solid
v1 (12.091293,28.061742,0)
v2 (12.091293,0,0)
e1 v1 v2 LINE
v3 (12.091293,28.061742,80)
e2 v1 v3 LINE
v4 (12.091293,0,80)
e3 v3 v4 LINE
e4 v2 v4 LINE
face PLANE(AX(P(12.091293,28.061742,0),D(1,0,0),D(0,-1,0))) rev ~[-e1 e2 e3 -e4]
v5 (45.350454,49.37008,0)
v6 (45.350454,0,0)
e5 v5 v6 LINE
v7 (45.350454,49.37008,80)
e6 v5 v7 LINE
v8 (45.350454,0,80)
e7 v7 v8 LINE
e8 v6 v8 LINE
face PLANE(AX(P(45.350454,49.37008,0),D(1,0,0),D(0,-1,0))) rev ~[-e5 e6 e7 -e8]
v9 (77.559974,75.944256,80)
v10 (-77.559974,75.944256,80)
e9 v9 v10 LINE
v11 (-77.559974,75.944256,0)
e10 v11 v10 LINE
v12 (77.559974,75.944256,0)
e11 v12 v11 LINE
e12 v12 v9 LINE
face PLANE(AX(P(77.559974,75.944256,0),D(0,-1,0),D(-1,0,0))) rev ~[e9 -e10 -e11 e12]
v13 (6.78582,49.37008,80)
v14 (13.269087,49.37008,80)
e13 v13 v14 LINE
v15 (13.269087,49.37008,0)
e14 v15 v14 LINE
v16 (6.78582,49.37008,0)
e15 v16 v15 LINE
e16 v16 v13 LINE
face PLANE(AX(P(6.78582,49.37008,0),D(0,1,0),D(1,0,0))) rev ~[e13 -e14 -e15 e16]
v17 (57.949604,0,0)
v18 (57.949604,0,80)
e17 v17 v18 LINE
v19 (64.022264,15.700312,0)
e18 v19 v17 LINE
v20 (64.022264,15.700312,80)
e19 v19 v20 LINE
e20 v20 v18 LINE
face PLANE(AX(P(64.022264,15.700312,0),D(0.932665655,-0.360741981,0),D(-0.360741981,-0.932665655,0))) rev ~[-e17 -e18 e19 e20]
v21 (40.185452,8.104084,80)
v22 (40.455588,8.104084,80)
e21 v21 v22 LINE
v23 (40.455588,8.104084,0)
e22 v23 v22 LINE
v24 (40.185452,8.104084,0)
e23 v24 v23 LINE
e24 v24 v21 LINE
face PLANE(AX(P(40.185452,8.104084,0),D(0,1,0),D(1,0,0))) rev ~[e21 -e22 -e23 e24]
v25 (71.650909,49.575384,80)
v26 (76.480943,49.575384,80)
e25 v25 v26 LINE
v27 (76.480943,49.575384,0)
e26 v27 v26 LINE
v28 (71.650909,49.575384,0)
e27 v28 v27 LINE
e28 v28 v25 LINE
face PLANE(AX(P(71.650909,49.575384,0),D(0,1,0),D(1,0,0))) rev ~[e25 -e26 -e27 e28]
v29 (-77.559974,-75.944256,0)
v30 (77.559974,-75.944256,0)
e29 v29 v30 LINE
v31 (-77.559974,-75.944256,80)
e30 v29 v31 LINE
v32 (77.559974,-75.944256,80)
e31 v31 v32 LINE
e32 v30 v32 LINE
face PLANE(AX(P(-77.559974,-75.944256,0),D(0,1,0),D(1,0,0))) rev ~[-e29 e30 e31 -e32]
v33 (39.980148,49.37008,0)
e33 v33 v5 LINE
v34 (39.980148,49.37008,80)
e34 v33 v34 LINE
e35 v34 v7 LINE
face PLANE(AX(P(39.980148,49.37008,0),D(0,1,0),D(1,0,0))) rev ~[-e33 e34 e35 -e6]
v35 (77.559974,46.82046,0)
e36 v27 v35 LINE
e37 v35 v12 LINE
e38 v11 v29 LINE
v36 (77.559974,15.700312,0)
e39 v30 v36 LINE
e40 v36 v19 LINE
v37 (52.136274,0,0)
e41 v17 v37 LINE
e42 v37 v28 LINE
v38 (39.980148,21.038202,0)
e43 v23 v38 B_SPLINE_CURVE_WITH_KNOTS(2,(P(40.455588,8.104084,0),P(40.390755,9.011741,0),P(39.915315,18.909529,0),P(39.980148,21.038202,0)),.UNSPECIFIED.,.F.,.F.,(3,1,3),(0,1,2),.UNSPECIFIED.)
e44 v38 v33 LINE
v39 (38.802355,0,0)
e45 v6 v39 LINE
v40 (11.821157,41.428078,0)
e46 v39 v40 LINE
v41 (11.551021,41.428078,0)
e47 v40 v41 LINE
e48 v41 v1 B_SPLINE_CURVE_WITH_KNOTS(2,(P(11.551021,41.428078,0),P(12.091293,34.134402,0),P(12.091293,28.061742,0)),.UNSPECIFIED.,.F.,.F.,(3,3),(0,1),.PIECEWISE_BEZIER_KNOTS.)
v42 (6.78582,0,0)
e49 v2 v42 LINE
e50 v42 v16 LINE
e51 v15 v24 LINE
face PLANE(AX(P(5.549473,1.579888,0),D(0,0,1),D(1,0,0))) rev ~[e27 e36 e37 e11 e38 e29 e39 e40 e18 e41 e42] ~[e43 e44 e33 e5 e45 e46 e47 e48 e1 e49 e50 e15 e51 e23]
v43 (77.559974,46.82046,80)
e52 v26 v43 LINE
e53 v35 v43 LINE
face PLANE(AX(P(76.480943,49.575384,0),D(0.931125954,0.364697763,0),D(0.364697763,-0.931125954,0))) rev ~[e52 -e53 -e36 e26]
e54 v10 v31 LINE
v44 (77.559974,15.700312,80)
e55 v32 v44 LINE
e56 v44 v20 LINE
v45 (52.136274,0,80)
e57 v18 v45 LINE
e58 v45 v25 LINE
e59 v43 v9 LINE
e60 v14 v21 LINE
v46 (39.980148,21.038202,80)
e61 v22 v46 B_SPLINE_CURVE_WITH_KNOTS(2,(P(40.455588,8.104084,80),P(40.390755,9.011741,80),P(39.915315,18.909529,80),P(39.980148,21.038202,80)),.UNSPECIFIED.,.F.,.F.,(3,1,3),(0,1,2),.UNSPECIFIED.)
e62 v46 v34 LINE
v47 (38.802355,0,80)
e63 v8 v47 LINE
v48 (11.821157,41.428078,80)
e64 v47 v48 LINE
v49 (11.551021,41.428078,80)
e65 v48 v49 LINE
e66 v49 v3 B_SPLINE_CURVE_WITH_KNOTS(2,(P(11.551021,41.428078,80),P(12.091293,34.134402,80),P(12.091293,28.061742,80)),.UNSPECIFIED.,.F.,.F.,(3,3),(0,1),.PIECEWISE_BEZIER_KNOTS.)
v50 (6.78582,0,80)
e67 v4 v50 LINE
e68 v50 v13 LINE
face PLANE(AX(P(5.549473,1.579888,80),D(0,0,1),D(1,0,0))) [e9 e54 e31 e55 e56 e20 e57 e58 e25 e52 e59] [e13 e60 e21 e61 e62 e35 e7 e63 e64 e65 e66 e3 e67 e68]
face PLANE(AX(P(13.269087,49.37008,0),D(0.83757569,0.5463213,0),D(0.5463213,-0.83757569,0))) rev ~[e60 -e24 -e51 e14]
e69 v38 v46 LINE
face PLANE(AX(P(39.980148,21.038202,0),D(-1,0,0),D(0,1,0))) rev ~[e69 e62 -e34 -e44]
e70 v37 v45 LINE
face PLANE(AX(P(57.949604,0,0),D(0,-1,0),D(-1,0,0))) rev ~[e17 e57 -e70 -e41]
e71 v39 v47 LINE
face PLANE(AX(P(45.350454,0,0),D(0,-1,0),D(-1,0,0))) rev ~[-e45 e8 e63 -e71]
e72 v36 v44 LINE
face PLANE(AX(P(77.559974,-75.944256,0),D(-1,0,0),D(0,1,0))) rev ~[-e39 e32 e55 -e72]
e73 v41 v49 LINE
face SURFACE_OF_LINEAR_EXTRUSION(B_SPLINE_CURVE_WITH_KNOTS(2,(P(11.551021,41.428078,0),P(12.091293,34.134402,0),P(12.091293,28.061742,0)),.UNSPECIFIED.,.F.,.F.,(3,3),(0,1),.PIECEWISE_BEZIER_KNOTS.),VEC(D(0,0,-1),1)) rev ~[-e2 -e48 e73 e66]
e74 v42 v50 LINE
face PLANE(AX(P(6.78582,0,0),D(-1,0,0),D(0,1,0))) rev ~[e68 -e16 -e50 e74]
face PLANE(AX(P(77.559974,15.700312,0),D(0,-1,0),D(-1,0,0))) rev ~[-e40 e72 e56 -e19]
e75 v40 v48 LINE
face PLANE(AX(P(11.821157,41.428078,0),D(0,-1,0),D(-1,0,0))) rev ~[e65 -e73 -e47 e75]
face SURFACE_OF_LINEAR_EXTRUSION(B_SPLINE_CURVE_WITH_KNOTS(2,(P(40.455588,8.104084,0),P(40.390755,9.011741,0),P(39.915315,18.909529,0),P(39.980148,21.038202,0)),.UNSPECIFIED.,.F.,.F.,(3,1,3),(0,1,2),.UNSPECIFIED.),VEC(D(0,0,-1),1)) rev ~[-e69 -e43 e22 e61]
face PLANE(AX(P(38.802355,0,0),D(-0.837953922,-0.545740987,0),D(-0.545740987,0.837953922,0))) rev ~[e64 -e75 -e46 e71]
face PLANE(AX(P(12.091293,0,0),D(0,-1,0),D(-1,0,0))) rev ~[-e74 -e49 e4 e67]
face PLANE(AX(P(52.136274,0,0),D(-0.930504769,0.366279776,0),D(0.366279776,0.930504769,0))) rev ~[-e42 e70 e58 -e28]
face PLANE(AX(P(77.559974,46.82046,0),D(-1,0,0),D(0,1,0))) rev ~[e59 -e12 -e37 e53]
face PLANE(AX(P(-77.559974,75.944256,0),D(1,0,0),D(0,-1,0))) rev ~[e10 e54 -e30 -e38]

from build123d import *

# Parameters (mm, degrees)
F1_DEPTH = 80


with BuildPart() as f1:
    # F0 (on Top) → F1 (new body)
    with BuildSketch(Plane.XY):
        Polygon((77.5599744916, 46.8204599889), (77.5599744916, 75.9442564845), (-77.5599744916, 75.9442564845), (-77.5599744916, -75.9442564845), (77.5599744916, -75.9442564845), (77.5599744916, 15.7003122036), (64.0222641474, 15.7003122036), (57.9496038182, 0), (52.1362741791, 0), (71.650908618, 49.5753836132), (76.4809427233, 49.5753836132), align=None)
        with BuildLine():
            Line((45.3504544518, 49.3700801502), (45.3504544518, 0))
            Line((45.3504544518, 0), (38.8023545238, 0))
            Line((38.8023545238, 0), (11.8211572957, 41.4280777622))
            Line((11.8211572957, 41.4280777622), (11.5510211601, 41.4280777622))
            add(Edge.make_bspline(
                [(11.5510211601, 41.4280777622), (12.0912934314, 34.1344020999), (12.0912934314, 28.0617417706)],
                knots=[0, 0, 0, 1, 1, 1], degree=2))
            Line((12.0912934314, 28.0617417706), (12.0912934314, 0))
            Line((12.0912934314, 0), (6.7858197274, 0))
            Line((6.7858197274, 0), (6.7858197274, 49.3700801502))
            Line((6.7858197274, 49.3700801502), (13.2690869828, 49.3700801502))
            Line((13.2690869828, 49.3700801502), (40.1854515383, 8.1040840693))
            Line((40.1854515383, 8.1040840693), (40.4555876739, 8.1040840693))
            add(Edge.make_bspline(
                [(40.4555876739, 8.1040840693), (40.3907550014, 9.0117414851), (40.153035202, 13.96063549)],
                knots=[0, 0, 0, 1, 1, 1], degree=2))
            add(Edge.make_bspline(
                [(40.153035202, 13.96063549), (39.9153154026, 18.909529495), (39.9801480752, 21.0382022439)],
                knots=[0, 0, 0, 1, 1, 1], degree=2))
            Line((39.9801480752, 21.0382022439), (39.9801480752, 49.3700801502))
            Line((39.9801480752, 49.3700801502), (45.3504544518, 49.3700801502))
        make_face(mode=Mode.SUBTRACT)
    extrude(amount=F1_DEPTH)


solid = f1.part
